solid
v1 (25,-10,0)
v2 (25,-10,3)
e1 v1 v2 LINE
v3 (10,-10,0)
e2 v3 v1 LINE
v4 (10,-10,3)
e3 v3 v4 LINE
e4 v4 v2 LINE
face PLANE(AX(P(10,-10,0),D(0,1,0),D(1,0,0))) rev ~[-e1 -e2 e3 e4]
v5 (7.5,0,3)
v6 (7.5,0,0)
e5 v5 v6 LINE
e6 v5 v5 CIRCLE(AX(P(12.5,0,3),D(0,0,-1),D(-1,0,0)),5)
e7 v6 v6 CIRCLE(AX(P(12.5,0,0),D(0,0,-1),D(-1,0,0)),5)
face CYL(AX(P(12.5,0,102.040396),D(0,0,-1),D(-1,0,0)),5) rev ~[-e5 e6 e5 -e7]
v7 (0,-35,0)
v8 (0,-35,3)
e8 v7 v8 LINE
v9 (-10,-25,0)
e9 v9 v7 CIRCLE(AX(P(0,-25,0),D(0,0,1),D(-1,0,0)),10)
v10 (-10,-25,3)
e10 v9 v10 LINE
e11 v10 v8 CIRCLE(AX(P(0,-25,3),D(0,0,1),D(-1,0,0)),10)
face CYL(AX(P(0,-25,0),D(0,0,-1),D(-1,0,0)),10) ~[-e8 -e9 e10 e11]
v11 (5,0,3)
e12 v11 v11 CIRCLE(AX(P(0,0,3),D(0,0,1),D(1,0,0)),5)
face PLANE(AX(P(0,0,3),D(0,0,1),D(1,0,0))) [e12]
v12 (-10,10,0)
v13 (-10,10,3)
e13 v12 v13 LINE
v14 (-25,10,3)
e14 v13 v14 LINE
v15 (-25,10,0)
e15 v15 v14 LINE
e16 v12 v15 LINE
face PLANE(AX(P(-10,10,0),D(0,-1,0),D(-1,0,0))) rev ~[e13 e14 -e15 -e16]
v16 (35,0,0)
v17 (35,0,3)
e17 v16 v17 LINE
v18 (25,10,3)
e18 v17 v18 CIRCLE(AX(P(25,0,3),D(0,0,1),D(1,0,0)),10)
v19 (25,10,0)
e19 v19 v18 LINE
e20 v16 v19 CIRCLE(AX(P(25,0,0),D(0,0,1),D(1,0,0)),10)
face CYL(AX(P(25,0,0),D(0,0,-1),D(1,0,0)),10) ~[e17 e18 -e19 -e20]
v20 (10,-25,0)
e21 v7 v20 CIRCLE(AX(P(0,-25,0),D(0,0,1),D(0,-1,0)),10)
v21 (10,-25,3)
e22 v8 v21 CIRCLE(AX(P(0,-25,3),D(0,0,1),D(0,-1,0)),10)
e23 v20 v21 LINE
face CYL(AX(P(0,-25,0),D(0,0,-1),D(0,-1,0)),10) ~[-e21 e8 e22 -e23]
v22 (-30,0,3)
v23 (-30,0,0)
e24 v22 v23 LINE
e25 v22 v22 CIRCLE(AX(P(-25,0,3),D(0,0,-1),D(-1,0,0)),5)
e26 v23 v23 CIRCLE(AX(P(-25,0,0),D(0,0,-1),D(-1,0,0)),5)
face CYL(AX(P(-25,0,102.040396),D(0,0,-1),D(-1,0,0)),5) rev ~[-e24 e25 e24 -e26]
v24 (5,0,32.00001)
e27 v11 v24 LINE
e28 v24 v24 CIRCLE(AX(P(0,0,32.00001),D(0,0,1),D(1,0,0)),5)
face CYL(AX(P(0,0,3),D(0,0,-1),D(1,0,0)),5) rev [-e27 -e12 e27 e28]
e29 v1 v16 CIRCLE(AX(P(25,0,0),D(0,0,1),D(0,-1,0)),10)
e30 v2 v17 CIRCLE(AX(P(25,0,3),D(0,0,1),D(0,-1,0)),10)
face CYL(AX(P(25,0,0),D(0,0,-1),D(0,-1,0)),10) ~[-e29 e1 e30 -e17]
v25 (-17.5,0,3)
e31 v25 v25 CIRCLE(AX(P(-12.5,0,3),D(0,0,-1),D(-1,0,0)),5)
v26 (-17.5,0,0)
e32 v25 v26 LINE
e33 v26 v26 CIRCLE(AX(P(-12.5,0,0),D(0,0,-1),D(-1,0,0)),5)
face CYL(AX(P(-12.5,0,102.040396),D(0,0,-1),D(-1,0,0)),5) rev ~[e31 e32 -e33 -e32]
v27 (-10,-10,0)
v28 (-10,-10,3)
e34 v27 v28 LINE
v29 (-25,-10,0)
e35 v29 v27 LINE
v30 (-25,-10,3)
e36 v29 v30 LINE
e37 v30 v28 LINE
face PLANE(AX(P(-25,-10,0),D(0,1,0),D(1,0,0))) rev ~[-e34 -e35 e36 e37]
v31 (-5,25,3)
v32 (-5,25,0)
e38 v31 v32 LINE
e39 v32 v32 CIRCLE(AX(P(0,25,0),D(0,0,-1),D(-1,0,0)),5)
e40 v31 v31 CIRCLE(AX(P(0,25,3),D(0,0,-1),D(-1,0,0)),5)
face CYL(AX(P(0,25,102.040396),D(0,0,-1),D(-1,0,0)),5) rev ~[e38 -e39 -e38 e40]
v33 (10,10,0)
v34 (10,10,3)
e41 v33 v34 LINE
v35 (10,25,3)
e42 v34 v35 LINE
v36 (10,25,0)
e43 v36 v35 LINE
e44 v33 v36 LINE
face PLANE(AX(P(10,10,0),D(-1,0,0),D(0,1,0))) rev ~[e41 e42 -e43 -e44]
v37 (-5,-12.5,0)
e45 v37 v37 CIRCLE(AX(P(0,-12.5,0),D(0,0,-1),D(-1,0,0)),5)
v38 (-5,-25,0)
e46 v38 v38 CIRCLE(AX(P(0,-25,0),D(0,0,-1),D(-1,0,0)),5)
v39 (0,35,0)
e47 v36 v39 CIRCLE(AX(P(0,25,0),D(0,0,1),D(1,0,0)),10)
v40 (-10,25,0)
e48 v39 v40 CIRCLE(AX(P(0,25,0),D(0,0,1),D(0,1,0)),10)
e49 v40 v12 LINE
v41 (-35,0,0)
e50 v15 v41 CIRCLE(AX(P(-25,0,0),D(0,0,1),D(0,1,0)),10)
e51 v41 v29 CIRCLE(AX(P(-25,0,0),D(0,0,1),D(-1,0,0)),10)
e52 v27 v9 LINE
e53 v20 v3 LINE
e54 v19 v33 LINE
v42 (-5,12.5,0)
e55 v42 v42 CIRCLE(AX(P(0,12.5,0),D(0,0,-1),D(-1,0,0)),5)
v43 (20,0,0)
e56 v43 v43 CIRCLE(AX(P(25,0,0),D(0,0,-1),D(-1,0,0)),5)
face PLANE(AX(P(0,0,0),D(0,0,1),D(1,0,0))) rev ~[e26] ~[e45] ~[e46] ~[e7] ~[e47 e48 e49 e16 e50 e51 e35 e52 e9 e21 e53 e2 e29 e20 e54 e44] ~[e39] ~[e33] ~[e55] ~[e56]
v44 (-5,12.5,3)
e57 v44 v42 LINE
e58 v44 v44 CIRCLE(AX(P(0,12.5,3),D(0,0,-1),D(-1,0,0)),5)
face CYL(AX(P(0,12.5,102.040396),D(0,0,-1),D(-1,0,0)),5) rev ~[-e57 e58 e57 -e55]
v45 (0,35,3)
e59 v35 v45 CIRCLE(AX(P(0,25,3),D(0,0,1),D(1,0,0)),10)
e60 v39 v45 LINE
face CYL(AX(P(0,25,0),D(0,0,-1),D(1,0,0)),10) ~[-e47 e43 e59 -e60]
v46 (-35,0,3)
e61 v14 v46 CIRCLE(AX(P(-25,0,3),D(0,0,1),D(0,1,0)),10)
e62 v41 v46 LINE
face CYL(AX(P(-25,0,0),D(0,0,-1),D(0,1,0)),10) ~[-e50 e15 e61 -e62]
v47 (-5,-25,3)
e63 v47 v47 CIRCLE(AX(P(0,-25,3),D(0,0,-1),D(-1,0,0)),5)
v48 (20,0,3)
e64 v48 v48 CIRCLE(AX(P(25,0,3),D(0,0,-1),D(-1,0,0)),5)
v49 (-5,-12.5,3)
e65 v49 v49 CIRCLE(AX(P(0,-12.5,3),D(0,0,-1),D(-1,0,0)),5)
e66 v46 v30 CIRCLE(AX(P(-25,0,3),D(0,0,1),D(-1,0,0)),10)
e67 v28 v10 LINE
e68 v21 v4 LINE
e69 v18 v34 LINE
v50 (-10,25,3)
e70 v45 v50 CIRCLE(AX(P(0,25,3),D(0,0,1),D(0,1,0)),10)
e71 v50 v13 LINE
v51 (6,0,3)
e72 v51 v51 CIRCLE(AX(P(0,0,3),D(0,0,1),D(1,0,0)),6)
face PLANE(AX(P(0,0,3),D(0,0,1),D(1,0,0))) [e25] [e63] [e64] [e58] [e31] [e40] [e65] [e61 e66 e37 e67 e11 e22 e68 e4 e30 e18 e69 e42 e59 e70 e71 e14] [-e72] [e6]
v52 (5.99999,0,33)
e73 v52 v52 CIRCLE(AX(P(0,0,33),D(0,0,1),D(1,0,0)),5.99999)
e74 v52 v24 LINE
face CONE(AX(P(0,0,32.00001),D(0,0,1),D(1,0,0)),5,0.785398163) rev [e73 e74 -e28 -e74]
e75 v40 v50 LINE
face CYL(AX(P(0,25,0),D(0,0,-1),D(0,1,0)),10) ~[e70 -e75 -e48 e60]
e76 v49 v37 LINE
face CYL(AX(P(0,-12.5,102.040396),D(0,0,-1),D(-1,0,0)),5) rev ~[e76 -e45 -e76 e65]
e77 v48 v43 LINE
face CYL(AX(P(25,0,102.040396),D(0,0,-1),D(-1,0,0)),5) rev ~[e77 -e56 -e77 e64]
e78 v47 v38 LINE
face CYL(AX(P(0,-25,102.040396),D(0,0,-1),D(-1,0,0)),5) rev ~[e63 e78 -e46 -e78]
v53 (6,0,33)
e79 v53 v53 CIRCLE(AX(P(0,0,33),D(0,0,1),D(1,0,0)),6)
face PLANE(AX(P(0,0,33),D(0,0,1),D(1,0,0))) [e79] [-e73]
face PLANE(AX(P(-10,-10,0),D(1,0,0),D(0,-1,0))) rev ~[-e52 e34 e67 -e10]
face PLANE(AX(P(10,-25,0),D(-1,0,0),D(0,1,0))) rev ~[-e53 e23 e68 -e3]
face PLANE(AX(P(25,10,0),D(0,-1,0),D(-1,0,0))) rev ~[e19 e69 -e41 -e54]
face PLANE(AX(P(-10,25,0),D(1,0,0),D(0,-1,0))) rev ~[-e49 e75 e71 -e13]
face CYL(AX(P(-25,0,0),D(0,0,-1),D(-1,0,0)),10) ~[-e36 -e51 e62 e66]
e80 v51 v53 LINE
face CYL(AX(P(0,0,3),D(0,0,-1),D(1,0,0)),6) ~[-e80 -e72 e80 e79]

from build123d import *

# Parameters (mm, degrees)
F1_DEPTH = 3
F3_D     = 10
F4_R     = 6
F4_R_2   = 5
F5_DEPTH = 30
F6_SIZE  = 0.99999


# Not quite as in the source:
# - a fillet or chamfer is up to 0.001 mm smaller than in the source, because OpenCascade refuses the exact size


with BuildPart() as f1:
    # F0 (on Top) → F1 (new body)
    with BuildSketch(Plane.XY):
        with BuildLine():
            Line((10, 10), (10, 25))
            ThreePointArc((10, 25), (7.0710678119, 32.0710678119), (0, 35))
            ThreePointArc((0, 35), (-7.0710678119, 32.0710678119), (-10, 25))
            Line((-10, 25), (-10, 10))
            Line((-10, 10), (-25, 10))
            ThreePointArc((-25, 10), (-32.0710678119, 7.0710678119), (-35, 0))
            ThreePointArc((-35, 0), (-32.0710678119, -7.0710678119), (-25, -10))
            Line((-25, -10), (-10, -10))
            Line((-10, -10), (-10, -25))
            ThreePointArc((-10, -25), (-7.0710678119, -32.0710678119), (0, -35))
            ThreePointArc((0, -35), (7.0710678119, -32.0710678119), (10, -25))
            Line((10, -25), (10, -10))
            Line((10, -10), (25, -10))
            ThreePointArc((25, -10), (32.0710678119, -7.0710678119), (35, 0))
            ThreePointArc((35, 0), (32.0710678119, 7.0710678119), (25, 10))
            Line((25, 10), (10, 10))
        make_face()
    extrude(amount=F1_DEPTH)

    # F3 (through all)
    with Locations(Plane.XY.offset(3)):
        with Locations((-25, 0), (-12.5, 0), (0, 25), (0, 12.5), (12.5, 0), (25, 0), (0, -12.5), (0, -25)):
            Hole(F3_D / 2)

    # F4 (on face) → F5 (join)
    with BuildSketch(Plane.XY.offset(3)):
        Circle(F4_R)
        Circle(F4_R_2, mode=Mode.SUBTRACT)
    extrude(amount=F5_DEPTH)

    # F6 (size 1 in the source; OpenCascade refuses exactly that, so slightly less here)
    f6_edges = [f1.edges().sort_by_distance(p)[0] for p in [
        (-5, 0, 33),
    ]]
    chamfer(f6_edges, length=F6_SIZE)


solid = f1.part
